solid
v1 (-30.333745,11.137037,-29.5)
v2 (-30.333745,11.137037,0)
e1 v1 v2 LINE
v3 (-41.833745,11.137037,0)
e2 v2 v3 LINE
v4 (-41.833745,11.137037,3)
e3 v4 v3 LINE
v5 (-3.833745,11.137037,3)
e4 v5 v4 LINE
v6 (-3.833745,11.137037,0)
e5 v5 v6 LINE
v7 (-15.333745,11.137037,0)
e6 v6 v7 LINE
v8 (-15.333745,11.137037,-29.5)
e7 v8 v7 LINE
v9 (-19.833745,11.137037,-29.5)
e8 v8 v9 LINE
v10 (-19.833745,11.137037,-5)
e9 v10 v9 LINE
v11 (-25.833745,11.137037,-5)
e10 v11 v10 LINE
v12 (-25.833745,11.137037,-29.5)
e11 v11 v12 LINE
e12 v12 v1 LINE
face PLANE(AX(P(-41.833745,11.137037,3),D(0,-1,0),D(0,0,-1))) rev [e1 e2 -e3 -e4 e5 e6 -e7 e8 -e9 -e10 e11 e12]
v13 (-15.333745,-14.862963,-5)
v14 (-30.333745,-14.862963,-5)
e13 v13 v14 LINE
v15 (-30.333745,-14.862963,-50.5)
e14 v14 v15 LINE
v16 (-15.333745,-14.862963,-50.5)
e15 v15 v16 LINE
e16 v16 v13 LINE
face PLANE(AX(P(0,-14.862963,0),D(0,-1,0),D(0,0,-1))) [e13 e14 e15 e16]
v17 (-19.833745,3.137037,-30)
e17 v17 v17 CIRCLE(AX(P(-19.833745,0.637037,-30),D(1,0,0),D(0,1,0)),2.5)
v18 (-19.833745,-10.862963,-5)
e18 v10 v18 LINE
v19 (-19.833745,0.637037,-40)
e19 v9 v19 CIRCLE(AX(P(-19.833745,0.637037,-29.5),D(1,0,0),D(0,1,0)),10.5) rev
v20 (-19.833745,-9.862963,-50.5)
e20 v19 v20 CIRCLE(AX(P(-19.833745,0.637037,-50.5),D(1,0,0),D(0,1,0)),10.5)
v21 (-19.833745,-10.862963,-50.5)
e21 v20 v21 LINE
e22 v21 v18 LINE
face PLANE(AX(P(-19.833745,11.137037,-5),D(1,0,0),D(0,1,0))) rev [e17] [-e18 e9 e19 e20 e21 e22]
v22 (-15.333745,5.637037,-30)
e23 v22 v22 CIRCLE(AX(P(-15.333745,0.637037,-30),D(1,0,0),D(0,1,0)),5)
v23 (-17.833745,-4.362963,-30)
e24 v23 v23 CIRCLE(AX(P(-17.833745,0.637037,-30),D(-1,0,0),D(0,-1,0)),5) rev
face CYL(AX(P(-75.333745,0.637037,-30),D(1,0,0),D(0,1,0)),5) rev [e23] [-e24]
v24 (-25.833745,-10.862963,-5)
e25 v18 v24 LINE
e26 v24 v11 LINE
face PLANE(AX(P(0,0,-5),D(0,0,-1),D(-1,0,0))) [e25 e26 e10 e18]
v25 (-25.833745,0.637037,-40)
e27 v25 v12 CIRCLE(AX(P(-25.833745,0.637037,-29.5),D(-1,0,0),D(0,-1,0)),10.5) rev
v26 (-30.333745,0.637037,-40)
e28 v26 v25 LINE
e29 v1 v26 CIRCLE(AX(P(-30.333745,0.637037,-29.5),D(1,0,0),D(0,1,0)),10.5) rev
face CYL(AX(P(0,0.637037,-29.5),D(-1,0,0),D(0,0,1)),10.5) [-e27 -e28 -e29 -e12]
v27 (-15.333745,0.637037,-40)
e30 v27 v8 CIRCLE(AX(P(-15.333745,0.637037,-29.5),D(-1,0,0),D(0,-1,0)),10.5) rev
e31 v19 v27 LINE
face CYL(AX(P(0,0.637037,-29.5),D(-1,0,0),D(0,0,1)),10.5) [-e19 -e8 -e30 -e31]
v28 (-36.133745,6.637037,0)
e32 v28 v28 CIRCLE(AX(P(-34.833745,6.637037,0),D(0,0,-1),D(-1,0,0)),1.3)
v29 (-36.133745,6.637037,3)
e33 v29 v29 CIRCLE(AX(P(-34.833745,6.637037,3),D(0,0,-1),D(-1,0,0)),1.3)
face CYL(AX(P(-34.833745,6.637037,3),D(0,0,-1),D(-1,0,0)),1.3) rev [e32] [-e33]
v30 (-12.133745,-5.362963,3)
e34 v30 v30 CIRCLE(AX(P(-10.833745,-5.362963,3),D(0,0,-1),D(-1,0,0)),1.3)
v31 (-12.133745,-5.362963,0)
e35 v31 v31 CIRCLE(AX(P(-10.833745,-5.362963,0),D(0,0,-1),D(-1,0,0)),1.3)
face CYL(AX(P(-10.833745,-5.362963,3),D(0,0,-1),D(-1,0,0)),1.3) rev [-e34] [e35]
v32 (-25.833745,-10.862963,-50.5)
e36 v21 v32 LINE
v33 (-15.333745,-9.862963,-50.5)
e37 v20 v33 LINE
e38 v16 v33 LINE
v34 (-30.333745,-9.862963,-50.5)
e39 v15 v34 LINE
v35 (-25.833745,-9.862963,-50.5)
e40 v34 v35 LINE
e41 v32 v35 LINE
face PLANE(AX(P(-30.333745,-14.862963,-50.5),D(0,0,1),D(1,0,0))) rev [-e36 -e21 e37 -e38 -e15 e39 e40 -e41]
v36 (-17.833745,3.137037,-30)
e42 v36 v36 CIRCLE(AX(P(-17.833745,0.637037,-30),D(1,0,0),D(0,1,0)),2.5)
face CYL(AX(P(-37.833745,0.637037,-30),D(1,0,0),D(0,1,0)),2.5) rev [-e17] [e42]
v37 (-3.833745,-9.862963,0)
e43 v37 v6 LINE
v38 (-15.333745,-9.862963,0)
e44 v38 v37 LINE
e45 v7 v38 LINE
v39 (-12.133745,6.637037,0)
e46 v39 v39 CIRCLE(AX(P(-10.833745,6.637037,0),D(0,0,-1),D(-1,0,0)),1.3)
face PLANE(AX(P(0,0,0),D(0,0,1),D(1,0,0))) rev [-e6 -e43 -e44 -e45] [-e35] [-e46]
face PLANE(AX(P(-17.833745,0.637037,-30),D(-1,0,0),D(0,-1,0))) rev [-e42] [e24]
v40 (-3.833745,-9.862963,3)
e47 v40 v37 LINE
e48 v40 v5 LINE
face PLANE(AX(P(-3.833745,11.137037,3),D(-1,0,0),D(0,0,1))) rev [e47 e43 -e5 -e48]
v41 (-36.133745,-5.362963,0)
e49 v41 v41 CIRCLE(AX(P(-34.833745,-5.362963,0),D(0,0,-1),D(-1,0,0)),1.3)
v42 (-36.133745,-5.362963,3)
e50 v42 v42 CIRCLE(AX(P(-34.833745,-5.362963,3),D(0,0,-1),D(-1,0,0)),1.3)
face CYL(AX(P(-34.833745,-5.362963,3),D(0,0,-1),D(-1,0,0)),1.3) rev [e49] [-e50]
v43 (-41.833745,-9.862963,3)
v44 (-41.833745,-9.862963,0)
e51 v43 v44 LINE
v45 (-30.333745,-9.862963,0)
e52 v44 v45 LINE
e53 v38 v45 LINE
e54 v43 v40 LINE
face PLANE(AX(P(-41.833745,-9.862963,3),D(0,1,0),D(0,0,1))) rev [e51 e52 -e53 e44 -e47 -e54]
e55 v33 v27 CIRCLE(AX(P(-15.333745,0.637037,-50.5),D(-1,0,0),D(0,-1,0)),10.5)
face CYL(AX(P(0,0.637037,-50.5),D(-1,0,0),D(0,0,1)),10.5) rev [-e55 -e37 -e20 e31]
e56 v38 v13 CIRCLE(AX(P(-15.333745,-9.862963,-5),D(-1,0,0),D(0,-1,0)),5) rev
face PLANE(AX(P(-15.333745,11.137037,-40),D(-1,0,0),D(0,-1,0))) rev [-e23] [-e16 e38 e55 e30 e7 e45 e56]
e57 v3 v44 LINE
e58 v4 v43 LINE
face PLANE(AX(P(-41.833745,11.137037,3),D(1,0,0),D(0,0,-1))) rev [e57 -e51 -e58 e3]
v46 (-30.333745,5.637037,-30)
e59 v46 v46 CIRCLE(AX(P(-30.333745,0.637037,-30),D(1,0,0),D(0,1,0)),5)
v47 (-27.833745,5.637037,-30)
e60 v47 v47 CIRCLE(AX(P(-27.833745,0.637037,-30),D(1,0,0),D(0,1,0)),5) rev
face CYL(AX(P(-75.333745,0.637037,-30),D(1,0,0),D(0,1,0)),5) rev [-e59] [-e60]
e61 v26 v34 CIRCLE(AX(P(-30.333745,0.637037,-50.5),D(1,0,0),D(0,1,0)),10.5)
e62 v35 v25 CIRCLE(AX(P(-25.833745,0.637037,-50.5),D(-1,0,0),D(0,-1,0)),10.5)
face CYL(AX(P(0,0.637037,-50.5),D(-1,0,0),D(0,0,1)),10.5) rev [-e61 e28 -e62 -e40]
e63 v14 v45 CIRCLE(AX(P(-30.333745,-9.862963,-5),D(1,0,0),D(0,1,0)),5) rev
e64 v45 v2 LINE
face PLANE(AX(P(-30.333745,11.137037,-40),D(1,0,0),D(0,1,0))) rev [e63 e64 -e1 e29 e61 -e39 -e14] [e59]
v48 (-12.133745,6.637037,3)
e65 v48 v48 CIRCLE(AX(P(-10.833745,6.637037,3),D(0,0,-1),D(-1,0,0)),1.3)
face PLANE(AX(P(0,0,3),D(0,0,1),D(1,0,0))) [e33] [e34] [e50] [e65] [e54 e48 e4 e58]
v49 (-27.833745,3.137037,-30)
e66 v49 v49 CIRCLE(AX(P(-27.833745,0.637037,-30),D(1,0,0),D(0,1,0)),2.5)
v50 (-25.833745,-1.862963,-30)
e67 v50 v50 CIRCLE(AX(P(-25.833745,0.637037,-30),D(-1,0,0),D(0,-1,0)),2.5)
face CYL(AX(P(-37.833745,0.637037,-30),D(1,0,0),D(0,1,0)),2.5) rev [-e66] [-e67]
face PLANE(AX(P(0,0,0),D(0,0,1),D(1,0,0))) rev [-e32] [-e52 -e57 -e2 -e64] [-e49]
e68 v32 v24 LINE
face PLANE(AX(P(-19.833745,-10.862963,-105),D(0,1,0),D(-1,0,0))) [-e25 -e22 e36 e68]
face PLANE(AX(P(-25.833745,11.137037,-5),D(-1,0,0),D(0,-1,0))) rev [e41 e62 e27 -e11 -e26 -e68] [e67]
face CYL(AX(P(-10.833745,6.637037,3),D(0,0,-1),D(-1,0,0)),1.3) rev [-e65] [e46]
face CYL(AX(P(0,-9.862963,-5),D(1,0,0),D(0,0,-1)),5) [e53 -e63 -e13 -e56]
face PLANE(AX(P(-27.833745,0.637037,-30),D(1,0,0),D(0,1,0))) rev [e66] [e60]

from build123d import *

# Parameters (mm, degrees)
SKETCH_1_W             = 38
SKETCH_1_H             = 21
EXTRUDE_1_DEPTH        = 3
SKETCH_2_R             = 1.3
CUT_EXTRUDE_1_DEPTH    = 3
PATTERN_LINEAR_1_COUNT = 2
PATTERN_LINEAR_1_PITCH = 24
SKETCH_9_W             = 15
SKETCH_9_H             = 21
EXTRUDE_5_DEPTH        = 40
SKETCH_10_R            = 5
CUT_EXTRUDE_5_DEPTH    = 60
SKETCH_11_W            = 6
SKETCH_11_H            = 21
CUT_EXTRUDE_6_DEPTH    = 35
SKETCH_12_R            = 6
EXTRUDE_6_DEPTH        = 2
SKETCH_14_R            = 6
EXTRUDE_8_DEPTH        = 2
SKETCH_15_R            = 2.5
CUT_EXTRUDE_7_DEPTH    = 20
SKETCH_16_W            = 15
SKETCH_16_H            = 50.5
EXTRUDE_9_DEPTH        = 5
FILLET_START           = -41.833744856
FILLET_2_DEPTH         = 38
FILLET_START_2         = -30.333744856
FILLET_2_2_DEPTH       = 4.5
FILLET_START_3         = -19.833744856
FILLET_2_3_DEPTH       = 4.5
FILLET_3_R             = 5
SKETCH_17_W            = 6
SKETCH_17_H            = 22
CUT_EXTRUDE_8_DEPTH    = 100


with BuildPart() as part:
    # 草图1 → 凸台-拉伸1 (new body)
    with BuildSketch(Plane.XY):
        with Locations((-22.833744856, 0.637037037)):
            Rectangle(SKETCH_1_W, SKETCH_1_H)
    extrude(amount=EXTRUDE_1_DEPTH)

    # 草图2 → 切除-拉伸1 (cut)
    with BuildSketch(Plane(origin=(0, 0, 0), x_dir=(-1, 0, 0), z_dir=(0, 0, -1))):
        with Locations((10.833744856, 6.637037037)):
            Circle(SKETCH_2_R)
        with Locations((10.833744856, -5.362962963)):
            Circle(SKETCH_2_R)
    cut_extrude_1 = extrude(amount=-CUT_EXTRUDE_1_DEPTH, mode=Mode.SUBTRACT)

    # 阵列(线性)1: 切除-拉伸1 ×2
    with Locations(*[(-i * PATTERN_LINEAR_1_PITCH, 0, 0) for i in range(1, PATTERN_LINEAR_1_COUNT)]):
        add(cut_extrude_1, mode=Mode.SUBTRACT)

    # 草图9 → 凸台-拉伸5 (add)
    with BuildSketch(Plane(origin=(0, 0, 0), x_dir=(-1, 0, 0), z_dir=(0, 0, -1))):
        with Locations((22.833744856, 0.637037037)):
            Rectangle(SKETCH_9_W, SKETCH_9_H)
    extrude(amount=EXTRUDE_5_DEPTH)

    # 草图10 → 切除-拉伸5 (cut)
    with BuildSketch(Plane(origin=(-15.333744856, 0, 0), x_dir=(0, 0, -1), z_dir=(1, 0, 0))):
        with Locations(Location((30, 0.637037037, 0), (0, 0, 90))):
            Circle(SKETCH_10_R)
    extrude(amount=-CUT_EXTRUDE_5_DEPTH, mode=Mode.SUBTRACT)

    # 草图11 → 切除-拉伸6 (cut)
    with BuildSketch(Plane(origin=(0, 0, -40), x_dir=(-1, 0, 0), z_dir=(0, 0, -1))):
        with Locations((22.833744856, 0.637037037)):
            Rectangle(SKETCH_11_W, SKETCH_11_H)
    extrude(amount=-CUT_EXTRUDE_6_DEPTH, mode=Mode.SUBTRACT)

    # 草图12 → 凸台-拉伸6 (add)
    with BuildSketch(Plane.ZY.offset(19.833744856)):
        with Locations((-30, 0.637037037)):
            Circle(SKETCH_12_R)
    extrude(amount=-EXTRUDE_6_DEPTH)

    # 草图14 → 凸台-拉伸8 (add)
    with BuildSketch(Plane(origin=(-25.833744856, 0, 0), x_dir=(0, 0, -1), z_dir=(1, 0, 0))):
        with Locations((30, 0.637037037)):
            Circle(SKETCH_14_R)
    extrude(amount=-EXTRUDE_8_DEPTH)

    # 草图15 → 切除-拉伸7 (cut)
    with BuildSketch(Plane(origin=(-17.833744856, 0, 0), x_dir=(0, 0, -1), z_dir=(1, 0, 0))):
        with Locations(Location((30, 0.637037037, 0), (0, 0, 90))):
            Circle(SKETCH_15_R)
    extrude(amount=-CUT_EXTRUDE_7_DEPTH, mode=Mode.SUBTRACT)

    # 草图16 → 凸台-拉伸9 (add)
    with BuildSketch(Plane(origin=(0, -9.862962963, 0), x_dir=(-1, 0, 0), z_dir=(0, -1, 0))):
        with Locations((22.833744856, 25.25)):
            Rectangle(SKETCH_16_W, SKETCH_16_H)
    extrude(amount=EXTRUDE_9_DEPTH)

    # 圆角2: read off the stored shape, not the designer's step
    # 圆角2 outline → 圆角2 (cut)
    with BuildSketch(Plane.YZ.offset(FILLET_START)):
        with BuildLine():
            Line((11.137037037, -40), (11.137037037, -29.5))
            ThreePointArc((11.137037037, -29.5), (8.061658239, -36.924621202), (0.637037037, -40))
            Line((0.637037037, -40), (11.137037037, -40))
        make_face()
    extrude(amount=FILLET_2_DEPTH, mode=Mode.SUBTRACT)

    # Fillet 2 2 outline → Fillet 2 2 (add)
    with BuildSketch(Plane.YZ.offset(FILLET_START_2)):
        with BuildLine():
            ThreePointArc((-9.862962963, -50.5), (-6.787584165, -43.075378798), (0.637037037, -40))
            Line((0.637037037, -40), (-9.862962963, -40))
            Line((-9.862962963, -40), (-9.862962963, -50.5))
        make_face()
    extrude(amount=FILLET_2_2_DEPTH)

    # Fillet 2 3 outline → Fillet 2 3 (add)
    with BuildSketch(Plane.YZ.offset(FILLET_START_3)):
        with BuildLine():
            ThreePointArc((-9.862962963, -50.5), (-6.787584165, -43.075378798), (0.637037037, -40))
            Line((0.637037037, -40), (-9.862962963, -40))
            Line((-9.862962963, -40), (-9.862962963, -50.5))
        make_face()
    extrude(amount=FILLET_2_3_DEPTH)

    # 圆角3
    fillet_3_edges = [part.edges().sort_by_distance(p)[0] for p in [
        (-22.833744856, -14.862962963, 0),
    ]]
    fillet(fillet_3_edges, radius=FILLET_3_R - 0.0001)  # a hair under: the kernel refuses the full size

    # 草图17 → 切除-拉伸8 (cut)
    with BuildSketch(Plane(origin=(0, 0, -5), x_dir=(-1, 0, 0), z_dir=(0, 0, -1))):
        with Locations((22.833744856, 0.137037037)):
            Rectangle(SKETCH_17_W, SKETCH_17_H)
    extrude(amount=CUT_EXTRUDE_8_DEPTH, mode=Mode.SUBTRACT)


solid = part.part
